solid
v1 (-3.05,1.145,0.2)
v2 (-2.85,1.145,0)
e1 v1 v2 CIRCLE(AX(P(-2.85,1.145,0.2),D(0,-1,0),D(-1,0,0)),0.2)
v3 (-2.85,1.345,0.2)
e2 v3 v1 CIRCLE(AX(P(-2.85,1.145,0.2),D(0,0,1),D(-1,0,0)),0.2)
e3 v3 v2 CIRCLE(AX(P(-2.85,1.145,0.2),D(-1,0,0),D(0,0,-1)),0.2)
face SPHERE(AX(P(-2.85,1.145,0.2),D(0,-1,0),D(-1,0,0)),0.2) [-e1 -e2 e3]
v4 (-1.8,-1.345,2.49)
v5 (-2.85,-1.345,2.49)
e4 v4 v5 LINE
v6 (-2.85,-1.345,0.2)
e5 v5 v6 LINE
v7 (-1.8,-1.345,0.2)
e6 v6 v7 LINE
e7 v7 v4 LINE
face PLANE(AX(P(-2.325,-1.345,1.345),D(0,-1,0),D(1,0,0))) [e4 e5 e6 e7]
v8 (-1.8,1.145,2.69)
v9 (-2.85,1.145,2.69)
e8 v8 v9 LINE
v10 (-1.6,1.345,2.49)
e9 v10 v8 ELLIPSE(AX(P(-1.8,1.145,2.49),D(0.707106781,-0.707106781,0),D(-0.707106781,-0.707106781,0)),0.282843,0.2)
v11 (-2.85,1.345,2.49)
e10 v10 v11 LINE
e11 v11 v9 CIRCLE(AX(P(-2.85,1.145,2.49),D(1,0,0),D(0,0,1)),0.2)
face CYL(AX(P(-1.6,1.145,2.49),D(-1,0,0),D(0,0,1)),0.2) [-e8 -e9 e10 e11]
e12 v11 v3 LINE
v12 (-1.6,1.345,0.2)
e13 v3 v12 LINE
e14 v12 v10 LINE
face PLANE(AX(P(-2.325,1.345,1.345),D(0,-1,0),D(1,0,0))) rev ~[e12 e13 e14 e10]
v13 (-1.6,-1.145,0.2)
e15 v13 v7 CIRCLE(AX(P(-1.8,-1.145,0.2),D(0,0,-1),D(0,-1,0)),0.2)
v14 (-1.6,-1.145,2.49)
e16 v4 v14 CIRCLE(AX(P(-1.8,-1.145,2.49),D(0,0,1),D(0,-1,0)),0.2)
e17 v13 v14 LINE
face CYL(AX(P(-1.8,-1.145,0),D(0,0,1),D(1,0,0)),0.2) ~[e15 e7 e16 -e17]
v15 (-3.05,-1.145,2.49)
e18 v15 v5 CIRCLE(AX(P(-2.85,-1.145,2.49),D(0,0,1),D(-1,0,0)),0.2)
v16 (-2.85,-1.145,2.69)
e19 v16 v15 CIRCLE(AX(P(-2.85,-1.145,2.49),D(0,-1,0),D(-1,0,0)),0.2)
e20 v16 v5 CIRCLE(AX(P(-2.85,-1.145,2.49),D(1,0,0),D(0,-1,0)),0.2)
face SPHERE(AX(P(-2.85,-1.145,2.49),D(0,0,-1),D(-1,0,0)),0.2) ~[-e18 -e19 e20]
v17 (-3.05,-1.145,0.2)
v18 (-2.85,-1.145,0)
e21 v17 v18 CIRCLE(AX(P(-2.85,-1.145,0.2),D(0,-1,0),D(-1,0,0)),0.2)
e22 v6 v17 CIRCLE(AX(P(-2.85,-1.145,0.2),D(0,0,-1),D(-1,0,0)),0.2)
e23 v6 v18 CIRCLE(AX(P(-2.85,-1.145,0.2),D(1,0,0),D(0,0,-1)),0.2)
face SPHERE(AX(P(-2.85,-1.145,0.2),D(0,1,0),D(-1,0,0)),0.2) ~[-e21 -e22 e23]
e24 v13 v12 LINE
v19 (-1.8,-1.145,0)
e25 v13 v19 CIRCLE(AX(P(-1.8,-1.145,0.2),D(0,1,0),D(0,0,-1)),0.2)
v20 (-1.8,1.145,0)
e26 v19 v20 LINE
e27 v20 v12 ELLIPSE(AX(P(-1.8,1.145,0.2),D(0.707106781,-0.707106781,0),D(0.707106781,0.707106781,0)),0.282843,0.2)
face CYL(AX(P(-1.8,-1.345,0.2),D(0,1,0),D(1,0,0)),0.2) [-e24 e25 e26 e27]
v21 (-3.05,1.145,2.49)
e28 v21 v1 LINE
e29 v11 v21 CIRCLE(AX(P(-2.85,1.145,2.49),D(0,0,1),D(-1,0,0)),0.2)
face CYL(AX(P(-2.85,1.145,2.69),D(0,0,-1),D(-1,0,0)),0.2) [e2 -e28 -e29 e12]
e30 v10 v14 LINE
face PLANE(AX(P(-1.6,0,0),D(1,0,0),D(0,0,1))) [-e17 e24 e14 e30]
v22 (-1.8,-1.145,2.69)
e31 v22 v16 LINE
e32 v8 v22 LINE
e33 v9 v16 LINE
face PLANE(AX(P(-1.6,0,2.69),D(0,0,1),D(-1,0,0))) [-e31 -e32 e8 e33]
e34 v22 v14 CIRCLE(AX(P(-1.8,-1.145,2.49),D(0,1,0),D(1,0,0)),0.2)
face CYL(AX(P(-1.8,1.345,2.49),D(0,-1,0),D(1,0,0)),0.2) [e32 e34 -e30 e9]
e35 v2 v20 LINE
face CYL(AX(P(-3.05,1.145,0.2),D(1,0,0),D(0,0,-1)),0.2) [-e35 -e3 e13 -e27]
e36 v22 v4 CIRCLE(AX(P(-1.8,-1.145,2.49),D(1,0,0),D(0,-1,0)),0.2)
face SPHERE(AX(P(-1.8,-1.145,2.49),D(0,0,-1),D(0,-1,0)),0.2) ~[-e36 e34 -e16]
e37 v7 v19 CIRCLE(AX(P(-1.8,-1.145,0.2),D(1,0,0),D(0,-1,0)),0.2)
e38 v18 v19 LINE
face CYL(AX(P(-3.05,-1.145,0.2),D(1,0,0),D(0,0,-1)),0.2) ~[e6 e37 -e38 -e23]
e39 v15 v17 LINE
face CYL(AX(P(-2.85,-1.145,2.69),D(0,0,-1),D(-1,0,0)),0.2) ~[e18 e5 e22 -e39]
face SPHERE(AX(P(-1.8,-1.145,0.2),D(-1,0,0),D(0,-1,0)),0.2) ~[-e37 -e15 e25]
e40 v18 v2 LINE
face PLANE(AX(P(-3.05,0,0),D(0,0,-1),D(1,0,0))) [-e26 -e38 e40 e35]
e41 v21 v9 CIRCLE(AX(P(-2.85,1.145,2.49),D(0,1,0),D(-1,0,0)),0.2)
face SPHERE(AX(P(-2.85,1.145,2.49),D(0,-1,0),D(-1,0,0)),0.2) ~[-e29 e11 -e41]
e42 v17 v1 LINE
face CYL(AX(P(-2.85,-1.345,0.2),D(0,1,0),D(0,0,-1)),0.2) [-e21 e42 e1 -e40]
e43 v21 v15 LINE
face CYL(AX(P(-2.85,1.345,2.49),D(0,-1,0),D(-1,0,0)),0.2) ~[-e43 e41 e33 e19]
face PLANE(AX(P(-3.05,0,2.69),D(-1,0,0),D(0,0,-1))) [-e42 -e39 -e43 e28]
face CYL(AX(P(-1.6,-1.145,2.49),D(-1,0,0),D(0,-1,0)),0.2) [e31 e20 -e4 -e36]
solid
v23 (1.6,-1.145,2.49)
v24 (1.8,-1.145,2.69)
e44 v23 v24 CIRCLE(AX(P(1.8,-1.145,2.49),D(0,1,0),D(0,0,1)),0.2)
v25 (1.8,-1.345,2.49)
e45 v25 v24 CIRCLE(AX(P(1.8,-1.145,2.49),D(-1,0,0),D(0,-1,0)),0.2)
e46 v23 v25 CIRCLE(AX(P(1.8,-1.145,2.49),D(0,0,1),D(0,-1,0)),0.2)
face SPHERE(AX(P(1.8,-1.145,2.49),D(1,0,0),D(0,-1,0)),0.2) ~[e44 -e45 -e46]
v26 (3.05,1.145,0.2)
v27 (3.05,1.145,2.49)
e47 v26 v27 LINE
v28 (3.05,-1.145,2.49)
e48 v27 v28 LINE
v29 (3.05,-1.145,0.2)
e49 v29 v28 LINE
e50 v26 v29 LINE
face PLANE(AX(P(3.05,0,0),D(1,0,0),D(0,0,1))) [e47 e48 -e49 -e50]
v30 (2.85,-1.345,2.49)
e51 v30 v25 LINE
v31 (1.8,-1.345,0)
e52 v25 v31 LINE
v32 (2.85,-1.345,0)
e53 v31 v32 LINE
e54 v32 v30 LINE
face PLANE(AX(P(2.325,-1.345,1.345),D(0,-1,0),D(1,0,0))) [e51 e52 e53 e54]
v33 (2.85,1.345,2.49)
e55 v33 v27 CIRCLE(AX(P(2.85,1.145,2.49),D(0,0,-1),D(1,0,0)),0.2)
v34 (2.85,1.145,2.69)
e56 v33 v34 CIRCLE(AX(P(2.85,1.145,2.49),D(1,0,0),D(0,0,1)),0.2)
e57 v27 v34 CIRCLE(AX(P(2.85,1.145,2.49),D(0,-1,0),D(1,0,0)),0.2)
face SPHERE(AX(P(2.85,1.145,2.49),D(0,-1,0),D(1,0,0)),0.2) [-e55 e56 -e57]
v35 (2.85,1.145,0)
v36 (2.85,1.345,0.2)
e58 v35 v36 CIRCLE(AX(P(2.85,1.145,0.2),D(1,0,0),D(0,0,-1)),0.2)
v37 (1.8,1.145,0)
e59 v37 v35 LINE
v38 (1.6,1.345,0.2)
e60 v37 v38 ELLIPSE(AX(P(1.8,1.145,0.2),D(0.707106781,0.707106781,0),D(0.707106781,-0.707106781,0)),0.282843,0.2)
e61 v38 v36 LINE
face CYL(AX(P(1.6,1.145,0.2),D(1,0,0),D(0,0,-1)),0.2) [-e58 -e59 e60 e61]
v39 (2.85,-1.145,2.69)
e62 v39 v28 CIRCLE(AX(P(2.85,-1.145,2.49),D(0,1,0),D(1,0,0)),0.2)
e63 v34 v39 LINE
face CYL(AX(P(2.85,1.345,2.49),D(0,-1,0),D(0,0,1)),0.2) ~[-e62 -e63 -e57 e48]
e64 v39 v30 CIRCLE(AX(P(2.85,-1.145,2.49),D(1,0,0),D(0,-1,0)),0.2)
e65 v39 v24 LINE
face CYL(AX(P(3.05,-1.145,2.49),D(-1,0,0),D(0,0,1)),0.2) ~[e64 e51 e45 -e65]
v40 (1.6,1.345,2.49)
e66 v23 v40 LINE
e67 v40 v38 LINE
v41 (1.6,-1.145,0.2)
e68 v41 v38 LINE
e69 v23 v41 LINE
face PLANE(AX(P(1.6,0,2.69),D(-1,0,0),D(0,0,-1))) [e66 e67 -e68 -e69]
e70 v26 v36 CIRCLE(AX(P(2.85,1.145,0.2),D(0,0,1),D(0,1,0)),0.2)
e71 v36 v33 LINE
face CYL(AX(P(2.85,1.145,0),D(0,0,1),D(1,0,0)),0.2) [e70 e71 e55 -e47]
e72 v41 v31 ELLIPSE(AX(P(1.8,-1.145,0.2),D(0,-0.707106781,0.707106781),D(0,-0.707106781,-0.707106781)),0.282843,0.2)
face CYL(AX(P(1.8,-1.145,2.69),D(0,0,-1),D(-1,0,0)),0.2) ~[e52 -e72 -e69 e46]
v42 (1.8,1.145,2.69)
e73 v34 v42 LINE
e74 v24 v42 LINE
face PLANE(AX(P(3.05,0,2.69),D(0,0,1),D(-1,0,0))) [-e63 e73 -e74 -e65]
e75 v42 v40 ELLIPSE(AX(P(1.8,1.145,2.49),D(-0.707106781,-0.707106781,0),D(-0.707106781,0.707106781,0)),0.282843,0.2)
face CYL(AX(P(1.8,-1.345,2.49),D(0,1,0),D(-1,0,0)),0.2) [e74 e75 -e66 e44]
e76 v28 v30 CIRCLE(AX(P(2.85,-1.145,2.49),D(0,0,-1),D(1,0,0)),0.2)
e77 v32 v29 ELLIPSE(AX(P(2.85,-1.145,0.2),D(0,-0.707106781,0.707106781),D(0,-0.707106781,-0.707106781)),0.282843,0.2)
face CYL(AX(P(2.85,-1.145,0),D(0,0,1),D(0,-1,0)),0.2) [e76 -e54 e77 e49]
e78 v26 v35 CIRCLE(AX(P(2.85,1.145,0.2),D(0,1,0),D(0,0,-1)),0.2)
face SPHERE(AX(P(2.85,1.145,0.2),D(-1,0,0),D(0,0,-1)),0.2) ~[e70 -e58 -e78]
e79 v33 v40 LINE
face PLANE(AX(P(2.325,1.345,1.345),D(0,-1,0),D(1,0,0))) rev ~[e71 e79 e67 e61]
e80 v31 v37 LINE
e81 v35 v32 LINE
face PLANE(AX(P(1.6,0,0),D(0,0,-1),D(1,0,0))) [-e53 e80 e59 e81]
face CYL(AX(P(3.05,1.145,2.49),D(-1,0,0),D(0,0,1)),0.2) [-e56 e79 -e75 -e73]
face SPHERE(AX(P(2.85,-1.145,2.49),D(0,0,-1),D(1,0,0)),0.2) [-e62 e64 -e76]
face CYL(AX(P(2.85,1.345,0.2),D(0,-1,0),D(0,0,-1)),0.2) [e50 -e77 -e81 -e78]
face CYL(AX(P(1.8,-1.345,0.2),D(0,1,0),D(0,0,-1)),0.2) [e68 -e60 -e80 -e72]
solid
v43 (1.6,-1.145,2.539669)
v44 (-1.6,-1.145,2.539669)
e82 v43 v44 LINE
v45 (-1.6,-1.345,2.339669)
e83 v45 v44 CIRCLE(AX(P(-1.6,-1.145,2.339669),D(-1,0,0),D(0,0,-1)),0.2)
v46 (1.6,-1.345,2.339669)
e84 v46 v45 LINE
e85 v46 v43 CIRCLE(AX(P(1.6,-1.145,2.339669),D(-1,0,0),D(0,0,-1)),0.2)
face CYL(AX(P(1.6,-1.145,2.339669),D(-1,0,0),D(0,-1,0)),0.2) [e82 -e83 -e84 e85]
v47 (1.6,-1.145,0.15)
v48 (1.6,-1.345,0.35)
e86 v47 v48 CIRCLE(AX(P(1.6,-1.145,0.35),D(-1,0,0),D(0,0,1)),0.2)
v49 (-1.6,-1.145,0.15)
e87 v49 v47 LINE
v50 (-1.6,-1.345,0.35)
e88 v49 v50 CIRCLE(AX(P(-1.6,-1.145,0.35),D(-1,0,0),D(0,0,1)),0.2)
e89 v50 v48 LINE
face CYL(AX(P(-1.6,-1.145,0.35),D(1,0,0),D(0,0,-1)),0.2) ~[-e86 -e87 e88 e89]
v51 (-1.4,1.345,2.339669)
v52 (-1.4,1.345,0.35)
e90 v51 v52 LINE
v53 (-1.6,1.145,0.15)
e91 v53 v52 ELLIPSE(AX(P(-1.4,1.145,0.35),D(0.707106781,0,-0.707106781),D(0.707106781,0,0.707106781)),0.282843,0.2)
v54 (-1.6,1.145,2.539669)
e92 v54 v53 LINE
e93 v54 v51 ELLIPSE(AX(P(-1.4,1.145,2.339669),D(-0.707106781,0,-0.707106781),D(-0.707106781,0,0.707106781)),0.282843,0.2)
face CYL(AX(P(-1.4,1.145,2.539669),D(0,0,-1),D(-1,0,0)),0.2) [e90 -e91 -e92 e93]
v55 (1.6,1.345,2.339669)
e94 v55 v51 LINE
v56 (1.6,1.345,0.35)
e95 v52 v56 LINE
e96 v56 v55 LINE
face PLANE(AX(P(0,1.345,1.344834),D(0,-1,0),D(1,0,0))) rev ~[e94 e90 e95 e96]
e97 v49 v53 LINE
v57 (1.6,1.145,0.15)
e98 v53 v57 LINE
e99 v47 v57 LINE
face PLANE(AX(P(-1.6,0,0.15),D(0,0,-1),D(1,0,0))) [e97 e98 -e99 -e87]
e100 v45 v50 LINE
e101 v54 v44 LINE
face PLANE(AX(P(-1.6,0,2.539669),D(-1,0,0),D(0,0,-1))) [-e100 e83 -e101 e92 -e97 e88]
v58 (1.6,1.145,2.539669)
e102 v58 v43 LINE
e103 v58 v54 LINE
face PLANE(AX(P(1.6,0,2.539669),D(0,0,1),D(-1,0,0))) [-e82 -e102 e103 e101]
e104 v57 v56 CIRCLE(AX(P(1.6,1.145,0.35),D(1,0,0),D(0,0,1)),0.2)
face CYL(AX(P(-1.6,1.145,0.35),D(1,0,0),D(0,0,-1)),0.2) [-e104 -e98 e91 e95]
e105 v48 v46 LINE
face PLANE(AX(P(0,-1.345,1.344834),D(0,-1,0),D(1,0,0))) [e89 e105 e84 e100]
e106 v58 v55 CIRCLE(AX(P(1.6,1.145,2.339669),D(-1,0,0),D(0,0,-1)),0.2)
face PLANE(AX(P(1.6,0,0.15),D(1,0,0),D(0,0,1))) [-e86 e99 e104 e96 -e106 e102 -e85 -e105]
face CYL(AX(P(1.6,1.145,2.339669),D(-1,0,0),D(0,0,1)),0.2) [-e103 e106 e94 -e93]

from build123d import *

# Parameters (mm, degrees)
F1_DEPTH = 1.345
F2_DEPTH = 1.345
F3_R     = 0.2
F3_2_R   = 0.2
F3_3_R   = 0.2


with BuildPart() as f1:
    # F0 (on Front) → F1 (new body, symmetric)
    with BuildSketch(Plane.XZ):
        Polygon((-1.6, 0), (-1.6, 0.15), (-1.6, 2.5396689307), (-1.6, 2.69), (-3.05, 2.69), (-3.05, 0), align=None)
    extrude(amount=F1_DEPTH, both=True)

    # F3#3
    f3_3_edges = [f1.edges().sort_by_distance(p)[0] for p in [
        (-3.05, 0, 0),
        (-3.05, -1.345, 1.345),
        (-3.05, 0, 2.69),
        (-3.05, 1.345, 1.345),
        (-2.325, 1.345, 0),
        (-2.325, -1.345, 0),
        (-1.6, -1.345, 1.345),
        (-1.6, 0, 0),
        (-2.325, -1.345, 2.69),
        (-1.6, 0, 2.69),
        (-2.325, 1.345, 2.69),
    ]]
    fillet(f3_3_edges, radius=F3_3_R)


with BuildPart() as f1b:
    # F0 (on Front) → F1, piece 2 (new body, symmetric)
    with BuildSketch(Plane.XZ):
        Polygon((1.6, 0.15), (1.6, 0), (3.05, 0), (3.05, 2.69), (1.6, 2.69), (1.6, 2.5396689307), align=None)
    extrude(amount=F1_DEPTH, both=True)

    # F3
    f3_edges = [f1b.edges().sort_by_distance(p)[0] for p in [
        (2.325, 1.345, 0),
        (3.05, 0, 0),
        (3.05, -1.345, 1.345),
        (3.05, 0, 2.69),
        (3.05, 1.345, 1.345),
        (2.325, 1.345, 2.69),
        (2.325, -1.345, 2.69),
        (1.6, -1.345, 1.345),
        (1.6, 0, 2.69),
        (1.6, 0, 0),
    ]]
    fillet(f3_edges, radius=F3_R)


with BuildPart() as f2:
    # F0 (on Front) → F2 (new body, symmetric)
    with BuildSketch(Plane.XZ):
        Polygon((0, 0.15), (1.6, 0.15), (1.6, 2.5396689307), (0, 2.5396689307), (-1.6, 2.5396689307), (-1.6, 0.15), align=None)
    extrude(amount=F2_DEPTH, both=True)

    # F3#2
    f3_2_edges = [f2.edges().sort_by_distance(p)[0] for p in [
        (0, -1.345, 2.539669),
        (0, -1.345, 0.15),
        (0, 1.345, 2.539669),
        (0, 1.345, 0.15),
        (-1.6, 1.345, 1.344834),
    ]]
    fillet(f3_2_edges, radius=F3_2_R)


solid = Compound([f1.part, f1b.part, f2.part])
